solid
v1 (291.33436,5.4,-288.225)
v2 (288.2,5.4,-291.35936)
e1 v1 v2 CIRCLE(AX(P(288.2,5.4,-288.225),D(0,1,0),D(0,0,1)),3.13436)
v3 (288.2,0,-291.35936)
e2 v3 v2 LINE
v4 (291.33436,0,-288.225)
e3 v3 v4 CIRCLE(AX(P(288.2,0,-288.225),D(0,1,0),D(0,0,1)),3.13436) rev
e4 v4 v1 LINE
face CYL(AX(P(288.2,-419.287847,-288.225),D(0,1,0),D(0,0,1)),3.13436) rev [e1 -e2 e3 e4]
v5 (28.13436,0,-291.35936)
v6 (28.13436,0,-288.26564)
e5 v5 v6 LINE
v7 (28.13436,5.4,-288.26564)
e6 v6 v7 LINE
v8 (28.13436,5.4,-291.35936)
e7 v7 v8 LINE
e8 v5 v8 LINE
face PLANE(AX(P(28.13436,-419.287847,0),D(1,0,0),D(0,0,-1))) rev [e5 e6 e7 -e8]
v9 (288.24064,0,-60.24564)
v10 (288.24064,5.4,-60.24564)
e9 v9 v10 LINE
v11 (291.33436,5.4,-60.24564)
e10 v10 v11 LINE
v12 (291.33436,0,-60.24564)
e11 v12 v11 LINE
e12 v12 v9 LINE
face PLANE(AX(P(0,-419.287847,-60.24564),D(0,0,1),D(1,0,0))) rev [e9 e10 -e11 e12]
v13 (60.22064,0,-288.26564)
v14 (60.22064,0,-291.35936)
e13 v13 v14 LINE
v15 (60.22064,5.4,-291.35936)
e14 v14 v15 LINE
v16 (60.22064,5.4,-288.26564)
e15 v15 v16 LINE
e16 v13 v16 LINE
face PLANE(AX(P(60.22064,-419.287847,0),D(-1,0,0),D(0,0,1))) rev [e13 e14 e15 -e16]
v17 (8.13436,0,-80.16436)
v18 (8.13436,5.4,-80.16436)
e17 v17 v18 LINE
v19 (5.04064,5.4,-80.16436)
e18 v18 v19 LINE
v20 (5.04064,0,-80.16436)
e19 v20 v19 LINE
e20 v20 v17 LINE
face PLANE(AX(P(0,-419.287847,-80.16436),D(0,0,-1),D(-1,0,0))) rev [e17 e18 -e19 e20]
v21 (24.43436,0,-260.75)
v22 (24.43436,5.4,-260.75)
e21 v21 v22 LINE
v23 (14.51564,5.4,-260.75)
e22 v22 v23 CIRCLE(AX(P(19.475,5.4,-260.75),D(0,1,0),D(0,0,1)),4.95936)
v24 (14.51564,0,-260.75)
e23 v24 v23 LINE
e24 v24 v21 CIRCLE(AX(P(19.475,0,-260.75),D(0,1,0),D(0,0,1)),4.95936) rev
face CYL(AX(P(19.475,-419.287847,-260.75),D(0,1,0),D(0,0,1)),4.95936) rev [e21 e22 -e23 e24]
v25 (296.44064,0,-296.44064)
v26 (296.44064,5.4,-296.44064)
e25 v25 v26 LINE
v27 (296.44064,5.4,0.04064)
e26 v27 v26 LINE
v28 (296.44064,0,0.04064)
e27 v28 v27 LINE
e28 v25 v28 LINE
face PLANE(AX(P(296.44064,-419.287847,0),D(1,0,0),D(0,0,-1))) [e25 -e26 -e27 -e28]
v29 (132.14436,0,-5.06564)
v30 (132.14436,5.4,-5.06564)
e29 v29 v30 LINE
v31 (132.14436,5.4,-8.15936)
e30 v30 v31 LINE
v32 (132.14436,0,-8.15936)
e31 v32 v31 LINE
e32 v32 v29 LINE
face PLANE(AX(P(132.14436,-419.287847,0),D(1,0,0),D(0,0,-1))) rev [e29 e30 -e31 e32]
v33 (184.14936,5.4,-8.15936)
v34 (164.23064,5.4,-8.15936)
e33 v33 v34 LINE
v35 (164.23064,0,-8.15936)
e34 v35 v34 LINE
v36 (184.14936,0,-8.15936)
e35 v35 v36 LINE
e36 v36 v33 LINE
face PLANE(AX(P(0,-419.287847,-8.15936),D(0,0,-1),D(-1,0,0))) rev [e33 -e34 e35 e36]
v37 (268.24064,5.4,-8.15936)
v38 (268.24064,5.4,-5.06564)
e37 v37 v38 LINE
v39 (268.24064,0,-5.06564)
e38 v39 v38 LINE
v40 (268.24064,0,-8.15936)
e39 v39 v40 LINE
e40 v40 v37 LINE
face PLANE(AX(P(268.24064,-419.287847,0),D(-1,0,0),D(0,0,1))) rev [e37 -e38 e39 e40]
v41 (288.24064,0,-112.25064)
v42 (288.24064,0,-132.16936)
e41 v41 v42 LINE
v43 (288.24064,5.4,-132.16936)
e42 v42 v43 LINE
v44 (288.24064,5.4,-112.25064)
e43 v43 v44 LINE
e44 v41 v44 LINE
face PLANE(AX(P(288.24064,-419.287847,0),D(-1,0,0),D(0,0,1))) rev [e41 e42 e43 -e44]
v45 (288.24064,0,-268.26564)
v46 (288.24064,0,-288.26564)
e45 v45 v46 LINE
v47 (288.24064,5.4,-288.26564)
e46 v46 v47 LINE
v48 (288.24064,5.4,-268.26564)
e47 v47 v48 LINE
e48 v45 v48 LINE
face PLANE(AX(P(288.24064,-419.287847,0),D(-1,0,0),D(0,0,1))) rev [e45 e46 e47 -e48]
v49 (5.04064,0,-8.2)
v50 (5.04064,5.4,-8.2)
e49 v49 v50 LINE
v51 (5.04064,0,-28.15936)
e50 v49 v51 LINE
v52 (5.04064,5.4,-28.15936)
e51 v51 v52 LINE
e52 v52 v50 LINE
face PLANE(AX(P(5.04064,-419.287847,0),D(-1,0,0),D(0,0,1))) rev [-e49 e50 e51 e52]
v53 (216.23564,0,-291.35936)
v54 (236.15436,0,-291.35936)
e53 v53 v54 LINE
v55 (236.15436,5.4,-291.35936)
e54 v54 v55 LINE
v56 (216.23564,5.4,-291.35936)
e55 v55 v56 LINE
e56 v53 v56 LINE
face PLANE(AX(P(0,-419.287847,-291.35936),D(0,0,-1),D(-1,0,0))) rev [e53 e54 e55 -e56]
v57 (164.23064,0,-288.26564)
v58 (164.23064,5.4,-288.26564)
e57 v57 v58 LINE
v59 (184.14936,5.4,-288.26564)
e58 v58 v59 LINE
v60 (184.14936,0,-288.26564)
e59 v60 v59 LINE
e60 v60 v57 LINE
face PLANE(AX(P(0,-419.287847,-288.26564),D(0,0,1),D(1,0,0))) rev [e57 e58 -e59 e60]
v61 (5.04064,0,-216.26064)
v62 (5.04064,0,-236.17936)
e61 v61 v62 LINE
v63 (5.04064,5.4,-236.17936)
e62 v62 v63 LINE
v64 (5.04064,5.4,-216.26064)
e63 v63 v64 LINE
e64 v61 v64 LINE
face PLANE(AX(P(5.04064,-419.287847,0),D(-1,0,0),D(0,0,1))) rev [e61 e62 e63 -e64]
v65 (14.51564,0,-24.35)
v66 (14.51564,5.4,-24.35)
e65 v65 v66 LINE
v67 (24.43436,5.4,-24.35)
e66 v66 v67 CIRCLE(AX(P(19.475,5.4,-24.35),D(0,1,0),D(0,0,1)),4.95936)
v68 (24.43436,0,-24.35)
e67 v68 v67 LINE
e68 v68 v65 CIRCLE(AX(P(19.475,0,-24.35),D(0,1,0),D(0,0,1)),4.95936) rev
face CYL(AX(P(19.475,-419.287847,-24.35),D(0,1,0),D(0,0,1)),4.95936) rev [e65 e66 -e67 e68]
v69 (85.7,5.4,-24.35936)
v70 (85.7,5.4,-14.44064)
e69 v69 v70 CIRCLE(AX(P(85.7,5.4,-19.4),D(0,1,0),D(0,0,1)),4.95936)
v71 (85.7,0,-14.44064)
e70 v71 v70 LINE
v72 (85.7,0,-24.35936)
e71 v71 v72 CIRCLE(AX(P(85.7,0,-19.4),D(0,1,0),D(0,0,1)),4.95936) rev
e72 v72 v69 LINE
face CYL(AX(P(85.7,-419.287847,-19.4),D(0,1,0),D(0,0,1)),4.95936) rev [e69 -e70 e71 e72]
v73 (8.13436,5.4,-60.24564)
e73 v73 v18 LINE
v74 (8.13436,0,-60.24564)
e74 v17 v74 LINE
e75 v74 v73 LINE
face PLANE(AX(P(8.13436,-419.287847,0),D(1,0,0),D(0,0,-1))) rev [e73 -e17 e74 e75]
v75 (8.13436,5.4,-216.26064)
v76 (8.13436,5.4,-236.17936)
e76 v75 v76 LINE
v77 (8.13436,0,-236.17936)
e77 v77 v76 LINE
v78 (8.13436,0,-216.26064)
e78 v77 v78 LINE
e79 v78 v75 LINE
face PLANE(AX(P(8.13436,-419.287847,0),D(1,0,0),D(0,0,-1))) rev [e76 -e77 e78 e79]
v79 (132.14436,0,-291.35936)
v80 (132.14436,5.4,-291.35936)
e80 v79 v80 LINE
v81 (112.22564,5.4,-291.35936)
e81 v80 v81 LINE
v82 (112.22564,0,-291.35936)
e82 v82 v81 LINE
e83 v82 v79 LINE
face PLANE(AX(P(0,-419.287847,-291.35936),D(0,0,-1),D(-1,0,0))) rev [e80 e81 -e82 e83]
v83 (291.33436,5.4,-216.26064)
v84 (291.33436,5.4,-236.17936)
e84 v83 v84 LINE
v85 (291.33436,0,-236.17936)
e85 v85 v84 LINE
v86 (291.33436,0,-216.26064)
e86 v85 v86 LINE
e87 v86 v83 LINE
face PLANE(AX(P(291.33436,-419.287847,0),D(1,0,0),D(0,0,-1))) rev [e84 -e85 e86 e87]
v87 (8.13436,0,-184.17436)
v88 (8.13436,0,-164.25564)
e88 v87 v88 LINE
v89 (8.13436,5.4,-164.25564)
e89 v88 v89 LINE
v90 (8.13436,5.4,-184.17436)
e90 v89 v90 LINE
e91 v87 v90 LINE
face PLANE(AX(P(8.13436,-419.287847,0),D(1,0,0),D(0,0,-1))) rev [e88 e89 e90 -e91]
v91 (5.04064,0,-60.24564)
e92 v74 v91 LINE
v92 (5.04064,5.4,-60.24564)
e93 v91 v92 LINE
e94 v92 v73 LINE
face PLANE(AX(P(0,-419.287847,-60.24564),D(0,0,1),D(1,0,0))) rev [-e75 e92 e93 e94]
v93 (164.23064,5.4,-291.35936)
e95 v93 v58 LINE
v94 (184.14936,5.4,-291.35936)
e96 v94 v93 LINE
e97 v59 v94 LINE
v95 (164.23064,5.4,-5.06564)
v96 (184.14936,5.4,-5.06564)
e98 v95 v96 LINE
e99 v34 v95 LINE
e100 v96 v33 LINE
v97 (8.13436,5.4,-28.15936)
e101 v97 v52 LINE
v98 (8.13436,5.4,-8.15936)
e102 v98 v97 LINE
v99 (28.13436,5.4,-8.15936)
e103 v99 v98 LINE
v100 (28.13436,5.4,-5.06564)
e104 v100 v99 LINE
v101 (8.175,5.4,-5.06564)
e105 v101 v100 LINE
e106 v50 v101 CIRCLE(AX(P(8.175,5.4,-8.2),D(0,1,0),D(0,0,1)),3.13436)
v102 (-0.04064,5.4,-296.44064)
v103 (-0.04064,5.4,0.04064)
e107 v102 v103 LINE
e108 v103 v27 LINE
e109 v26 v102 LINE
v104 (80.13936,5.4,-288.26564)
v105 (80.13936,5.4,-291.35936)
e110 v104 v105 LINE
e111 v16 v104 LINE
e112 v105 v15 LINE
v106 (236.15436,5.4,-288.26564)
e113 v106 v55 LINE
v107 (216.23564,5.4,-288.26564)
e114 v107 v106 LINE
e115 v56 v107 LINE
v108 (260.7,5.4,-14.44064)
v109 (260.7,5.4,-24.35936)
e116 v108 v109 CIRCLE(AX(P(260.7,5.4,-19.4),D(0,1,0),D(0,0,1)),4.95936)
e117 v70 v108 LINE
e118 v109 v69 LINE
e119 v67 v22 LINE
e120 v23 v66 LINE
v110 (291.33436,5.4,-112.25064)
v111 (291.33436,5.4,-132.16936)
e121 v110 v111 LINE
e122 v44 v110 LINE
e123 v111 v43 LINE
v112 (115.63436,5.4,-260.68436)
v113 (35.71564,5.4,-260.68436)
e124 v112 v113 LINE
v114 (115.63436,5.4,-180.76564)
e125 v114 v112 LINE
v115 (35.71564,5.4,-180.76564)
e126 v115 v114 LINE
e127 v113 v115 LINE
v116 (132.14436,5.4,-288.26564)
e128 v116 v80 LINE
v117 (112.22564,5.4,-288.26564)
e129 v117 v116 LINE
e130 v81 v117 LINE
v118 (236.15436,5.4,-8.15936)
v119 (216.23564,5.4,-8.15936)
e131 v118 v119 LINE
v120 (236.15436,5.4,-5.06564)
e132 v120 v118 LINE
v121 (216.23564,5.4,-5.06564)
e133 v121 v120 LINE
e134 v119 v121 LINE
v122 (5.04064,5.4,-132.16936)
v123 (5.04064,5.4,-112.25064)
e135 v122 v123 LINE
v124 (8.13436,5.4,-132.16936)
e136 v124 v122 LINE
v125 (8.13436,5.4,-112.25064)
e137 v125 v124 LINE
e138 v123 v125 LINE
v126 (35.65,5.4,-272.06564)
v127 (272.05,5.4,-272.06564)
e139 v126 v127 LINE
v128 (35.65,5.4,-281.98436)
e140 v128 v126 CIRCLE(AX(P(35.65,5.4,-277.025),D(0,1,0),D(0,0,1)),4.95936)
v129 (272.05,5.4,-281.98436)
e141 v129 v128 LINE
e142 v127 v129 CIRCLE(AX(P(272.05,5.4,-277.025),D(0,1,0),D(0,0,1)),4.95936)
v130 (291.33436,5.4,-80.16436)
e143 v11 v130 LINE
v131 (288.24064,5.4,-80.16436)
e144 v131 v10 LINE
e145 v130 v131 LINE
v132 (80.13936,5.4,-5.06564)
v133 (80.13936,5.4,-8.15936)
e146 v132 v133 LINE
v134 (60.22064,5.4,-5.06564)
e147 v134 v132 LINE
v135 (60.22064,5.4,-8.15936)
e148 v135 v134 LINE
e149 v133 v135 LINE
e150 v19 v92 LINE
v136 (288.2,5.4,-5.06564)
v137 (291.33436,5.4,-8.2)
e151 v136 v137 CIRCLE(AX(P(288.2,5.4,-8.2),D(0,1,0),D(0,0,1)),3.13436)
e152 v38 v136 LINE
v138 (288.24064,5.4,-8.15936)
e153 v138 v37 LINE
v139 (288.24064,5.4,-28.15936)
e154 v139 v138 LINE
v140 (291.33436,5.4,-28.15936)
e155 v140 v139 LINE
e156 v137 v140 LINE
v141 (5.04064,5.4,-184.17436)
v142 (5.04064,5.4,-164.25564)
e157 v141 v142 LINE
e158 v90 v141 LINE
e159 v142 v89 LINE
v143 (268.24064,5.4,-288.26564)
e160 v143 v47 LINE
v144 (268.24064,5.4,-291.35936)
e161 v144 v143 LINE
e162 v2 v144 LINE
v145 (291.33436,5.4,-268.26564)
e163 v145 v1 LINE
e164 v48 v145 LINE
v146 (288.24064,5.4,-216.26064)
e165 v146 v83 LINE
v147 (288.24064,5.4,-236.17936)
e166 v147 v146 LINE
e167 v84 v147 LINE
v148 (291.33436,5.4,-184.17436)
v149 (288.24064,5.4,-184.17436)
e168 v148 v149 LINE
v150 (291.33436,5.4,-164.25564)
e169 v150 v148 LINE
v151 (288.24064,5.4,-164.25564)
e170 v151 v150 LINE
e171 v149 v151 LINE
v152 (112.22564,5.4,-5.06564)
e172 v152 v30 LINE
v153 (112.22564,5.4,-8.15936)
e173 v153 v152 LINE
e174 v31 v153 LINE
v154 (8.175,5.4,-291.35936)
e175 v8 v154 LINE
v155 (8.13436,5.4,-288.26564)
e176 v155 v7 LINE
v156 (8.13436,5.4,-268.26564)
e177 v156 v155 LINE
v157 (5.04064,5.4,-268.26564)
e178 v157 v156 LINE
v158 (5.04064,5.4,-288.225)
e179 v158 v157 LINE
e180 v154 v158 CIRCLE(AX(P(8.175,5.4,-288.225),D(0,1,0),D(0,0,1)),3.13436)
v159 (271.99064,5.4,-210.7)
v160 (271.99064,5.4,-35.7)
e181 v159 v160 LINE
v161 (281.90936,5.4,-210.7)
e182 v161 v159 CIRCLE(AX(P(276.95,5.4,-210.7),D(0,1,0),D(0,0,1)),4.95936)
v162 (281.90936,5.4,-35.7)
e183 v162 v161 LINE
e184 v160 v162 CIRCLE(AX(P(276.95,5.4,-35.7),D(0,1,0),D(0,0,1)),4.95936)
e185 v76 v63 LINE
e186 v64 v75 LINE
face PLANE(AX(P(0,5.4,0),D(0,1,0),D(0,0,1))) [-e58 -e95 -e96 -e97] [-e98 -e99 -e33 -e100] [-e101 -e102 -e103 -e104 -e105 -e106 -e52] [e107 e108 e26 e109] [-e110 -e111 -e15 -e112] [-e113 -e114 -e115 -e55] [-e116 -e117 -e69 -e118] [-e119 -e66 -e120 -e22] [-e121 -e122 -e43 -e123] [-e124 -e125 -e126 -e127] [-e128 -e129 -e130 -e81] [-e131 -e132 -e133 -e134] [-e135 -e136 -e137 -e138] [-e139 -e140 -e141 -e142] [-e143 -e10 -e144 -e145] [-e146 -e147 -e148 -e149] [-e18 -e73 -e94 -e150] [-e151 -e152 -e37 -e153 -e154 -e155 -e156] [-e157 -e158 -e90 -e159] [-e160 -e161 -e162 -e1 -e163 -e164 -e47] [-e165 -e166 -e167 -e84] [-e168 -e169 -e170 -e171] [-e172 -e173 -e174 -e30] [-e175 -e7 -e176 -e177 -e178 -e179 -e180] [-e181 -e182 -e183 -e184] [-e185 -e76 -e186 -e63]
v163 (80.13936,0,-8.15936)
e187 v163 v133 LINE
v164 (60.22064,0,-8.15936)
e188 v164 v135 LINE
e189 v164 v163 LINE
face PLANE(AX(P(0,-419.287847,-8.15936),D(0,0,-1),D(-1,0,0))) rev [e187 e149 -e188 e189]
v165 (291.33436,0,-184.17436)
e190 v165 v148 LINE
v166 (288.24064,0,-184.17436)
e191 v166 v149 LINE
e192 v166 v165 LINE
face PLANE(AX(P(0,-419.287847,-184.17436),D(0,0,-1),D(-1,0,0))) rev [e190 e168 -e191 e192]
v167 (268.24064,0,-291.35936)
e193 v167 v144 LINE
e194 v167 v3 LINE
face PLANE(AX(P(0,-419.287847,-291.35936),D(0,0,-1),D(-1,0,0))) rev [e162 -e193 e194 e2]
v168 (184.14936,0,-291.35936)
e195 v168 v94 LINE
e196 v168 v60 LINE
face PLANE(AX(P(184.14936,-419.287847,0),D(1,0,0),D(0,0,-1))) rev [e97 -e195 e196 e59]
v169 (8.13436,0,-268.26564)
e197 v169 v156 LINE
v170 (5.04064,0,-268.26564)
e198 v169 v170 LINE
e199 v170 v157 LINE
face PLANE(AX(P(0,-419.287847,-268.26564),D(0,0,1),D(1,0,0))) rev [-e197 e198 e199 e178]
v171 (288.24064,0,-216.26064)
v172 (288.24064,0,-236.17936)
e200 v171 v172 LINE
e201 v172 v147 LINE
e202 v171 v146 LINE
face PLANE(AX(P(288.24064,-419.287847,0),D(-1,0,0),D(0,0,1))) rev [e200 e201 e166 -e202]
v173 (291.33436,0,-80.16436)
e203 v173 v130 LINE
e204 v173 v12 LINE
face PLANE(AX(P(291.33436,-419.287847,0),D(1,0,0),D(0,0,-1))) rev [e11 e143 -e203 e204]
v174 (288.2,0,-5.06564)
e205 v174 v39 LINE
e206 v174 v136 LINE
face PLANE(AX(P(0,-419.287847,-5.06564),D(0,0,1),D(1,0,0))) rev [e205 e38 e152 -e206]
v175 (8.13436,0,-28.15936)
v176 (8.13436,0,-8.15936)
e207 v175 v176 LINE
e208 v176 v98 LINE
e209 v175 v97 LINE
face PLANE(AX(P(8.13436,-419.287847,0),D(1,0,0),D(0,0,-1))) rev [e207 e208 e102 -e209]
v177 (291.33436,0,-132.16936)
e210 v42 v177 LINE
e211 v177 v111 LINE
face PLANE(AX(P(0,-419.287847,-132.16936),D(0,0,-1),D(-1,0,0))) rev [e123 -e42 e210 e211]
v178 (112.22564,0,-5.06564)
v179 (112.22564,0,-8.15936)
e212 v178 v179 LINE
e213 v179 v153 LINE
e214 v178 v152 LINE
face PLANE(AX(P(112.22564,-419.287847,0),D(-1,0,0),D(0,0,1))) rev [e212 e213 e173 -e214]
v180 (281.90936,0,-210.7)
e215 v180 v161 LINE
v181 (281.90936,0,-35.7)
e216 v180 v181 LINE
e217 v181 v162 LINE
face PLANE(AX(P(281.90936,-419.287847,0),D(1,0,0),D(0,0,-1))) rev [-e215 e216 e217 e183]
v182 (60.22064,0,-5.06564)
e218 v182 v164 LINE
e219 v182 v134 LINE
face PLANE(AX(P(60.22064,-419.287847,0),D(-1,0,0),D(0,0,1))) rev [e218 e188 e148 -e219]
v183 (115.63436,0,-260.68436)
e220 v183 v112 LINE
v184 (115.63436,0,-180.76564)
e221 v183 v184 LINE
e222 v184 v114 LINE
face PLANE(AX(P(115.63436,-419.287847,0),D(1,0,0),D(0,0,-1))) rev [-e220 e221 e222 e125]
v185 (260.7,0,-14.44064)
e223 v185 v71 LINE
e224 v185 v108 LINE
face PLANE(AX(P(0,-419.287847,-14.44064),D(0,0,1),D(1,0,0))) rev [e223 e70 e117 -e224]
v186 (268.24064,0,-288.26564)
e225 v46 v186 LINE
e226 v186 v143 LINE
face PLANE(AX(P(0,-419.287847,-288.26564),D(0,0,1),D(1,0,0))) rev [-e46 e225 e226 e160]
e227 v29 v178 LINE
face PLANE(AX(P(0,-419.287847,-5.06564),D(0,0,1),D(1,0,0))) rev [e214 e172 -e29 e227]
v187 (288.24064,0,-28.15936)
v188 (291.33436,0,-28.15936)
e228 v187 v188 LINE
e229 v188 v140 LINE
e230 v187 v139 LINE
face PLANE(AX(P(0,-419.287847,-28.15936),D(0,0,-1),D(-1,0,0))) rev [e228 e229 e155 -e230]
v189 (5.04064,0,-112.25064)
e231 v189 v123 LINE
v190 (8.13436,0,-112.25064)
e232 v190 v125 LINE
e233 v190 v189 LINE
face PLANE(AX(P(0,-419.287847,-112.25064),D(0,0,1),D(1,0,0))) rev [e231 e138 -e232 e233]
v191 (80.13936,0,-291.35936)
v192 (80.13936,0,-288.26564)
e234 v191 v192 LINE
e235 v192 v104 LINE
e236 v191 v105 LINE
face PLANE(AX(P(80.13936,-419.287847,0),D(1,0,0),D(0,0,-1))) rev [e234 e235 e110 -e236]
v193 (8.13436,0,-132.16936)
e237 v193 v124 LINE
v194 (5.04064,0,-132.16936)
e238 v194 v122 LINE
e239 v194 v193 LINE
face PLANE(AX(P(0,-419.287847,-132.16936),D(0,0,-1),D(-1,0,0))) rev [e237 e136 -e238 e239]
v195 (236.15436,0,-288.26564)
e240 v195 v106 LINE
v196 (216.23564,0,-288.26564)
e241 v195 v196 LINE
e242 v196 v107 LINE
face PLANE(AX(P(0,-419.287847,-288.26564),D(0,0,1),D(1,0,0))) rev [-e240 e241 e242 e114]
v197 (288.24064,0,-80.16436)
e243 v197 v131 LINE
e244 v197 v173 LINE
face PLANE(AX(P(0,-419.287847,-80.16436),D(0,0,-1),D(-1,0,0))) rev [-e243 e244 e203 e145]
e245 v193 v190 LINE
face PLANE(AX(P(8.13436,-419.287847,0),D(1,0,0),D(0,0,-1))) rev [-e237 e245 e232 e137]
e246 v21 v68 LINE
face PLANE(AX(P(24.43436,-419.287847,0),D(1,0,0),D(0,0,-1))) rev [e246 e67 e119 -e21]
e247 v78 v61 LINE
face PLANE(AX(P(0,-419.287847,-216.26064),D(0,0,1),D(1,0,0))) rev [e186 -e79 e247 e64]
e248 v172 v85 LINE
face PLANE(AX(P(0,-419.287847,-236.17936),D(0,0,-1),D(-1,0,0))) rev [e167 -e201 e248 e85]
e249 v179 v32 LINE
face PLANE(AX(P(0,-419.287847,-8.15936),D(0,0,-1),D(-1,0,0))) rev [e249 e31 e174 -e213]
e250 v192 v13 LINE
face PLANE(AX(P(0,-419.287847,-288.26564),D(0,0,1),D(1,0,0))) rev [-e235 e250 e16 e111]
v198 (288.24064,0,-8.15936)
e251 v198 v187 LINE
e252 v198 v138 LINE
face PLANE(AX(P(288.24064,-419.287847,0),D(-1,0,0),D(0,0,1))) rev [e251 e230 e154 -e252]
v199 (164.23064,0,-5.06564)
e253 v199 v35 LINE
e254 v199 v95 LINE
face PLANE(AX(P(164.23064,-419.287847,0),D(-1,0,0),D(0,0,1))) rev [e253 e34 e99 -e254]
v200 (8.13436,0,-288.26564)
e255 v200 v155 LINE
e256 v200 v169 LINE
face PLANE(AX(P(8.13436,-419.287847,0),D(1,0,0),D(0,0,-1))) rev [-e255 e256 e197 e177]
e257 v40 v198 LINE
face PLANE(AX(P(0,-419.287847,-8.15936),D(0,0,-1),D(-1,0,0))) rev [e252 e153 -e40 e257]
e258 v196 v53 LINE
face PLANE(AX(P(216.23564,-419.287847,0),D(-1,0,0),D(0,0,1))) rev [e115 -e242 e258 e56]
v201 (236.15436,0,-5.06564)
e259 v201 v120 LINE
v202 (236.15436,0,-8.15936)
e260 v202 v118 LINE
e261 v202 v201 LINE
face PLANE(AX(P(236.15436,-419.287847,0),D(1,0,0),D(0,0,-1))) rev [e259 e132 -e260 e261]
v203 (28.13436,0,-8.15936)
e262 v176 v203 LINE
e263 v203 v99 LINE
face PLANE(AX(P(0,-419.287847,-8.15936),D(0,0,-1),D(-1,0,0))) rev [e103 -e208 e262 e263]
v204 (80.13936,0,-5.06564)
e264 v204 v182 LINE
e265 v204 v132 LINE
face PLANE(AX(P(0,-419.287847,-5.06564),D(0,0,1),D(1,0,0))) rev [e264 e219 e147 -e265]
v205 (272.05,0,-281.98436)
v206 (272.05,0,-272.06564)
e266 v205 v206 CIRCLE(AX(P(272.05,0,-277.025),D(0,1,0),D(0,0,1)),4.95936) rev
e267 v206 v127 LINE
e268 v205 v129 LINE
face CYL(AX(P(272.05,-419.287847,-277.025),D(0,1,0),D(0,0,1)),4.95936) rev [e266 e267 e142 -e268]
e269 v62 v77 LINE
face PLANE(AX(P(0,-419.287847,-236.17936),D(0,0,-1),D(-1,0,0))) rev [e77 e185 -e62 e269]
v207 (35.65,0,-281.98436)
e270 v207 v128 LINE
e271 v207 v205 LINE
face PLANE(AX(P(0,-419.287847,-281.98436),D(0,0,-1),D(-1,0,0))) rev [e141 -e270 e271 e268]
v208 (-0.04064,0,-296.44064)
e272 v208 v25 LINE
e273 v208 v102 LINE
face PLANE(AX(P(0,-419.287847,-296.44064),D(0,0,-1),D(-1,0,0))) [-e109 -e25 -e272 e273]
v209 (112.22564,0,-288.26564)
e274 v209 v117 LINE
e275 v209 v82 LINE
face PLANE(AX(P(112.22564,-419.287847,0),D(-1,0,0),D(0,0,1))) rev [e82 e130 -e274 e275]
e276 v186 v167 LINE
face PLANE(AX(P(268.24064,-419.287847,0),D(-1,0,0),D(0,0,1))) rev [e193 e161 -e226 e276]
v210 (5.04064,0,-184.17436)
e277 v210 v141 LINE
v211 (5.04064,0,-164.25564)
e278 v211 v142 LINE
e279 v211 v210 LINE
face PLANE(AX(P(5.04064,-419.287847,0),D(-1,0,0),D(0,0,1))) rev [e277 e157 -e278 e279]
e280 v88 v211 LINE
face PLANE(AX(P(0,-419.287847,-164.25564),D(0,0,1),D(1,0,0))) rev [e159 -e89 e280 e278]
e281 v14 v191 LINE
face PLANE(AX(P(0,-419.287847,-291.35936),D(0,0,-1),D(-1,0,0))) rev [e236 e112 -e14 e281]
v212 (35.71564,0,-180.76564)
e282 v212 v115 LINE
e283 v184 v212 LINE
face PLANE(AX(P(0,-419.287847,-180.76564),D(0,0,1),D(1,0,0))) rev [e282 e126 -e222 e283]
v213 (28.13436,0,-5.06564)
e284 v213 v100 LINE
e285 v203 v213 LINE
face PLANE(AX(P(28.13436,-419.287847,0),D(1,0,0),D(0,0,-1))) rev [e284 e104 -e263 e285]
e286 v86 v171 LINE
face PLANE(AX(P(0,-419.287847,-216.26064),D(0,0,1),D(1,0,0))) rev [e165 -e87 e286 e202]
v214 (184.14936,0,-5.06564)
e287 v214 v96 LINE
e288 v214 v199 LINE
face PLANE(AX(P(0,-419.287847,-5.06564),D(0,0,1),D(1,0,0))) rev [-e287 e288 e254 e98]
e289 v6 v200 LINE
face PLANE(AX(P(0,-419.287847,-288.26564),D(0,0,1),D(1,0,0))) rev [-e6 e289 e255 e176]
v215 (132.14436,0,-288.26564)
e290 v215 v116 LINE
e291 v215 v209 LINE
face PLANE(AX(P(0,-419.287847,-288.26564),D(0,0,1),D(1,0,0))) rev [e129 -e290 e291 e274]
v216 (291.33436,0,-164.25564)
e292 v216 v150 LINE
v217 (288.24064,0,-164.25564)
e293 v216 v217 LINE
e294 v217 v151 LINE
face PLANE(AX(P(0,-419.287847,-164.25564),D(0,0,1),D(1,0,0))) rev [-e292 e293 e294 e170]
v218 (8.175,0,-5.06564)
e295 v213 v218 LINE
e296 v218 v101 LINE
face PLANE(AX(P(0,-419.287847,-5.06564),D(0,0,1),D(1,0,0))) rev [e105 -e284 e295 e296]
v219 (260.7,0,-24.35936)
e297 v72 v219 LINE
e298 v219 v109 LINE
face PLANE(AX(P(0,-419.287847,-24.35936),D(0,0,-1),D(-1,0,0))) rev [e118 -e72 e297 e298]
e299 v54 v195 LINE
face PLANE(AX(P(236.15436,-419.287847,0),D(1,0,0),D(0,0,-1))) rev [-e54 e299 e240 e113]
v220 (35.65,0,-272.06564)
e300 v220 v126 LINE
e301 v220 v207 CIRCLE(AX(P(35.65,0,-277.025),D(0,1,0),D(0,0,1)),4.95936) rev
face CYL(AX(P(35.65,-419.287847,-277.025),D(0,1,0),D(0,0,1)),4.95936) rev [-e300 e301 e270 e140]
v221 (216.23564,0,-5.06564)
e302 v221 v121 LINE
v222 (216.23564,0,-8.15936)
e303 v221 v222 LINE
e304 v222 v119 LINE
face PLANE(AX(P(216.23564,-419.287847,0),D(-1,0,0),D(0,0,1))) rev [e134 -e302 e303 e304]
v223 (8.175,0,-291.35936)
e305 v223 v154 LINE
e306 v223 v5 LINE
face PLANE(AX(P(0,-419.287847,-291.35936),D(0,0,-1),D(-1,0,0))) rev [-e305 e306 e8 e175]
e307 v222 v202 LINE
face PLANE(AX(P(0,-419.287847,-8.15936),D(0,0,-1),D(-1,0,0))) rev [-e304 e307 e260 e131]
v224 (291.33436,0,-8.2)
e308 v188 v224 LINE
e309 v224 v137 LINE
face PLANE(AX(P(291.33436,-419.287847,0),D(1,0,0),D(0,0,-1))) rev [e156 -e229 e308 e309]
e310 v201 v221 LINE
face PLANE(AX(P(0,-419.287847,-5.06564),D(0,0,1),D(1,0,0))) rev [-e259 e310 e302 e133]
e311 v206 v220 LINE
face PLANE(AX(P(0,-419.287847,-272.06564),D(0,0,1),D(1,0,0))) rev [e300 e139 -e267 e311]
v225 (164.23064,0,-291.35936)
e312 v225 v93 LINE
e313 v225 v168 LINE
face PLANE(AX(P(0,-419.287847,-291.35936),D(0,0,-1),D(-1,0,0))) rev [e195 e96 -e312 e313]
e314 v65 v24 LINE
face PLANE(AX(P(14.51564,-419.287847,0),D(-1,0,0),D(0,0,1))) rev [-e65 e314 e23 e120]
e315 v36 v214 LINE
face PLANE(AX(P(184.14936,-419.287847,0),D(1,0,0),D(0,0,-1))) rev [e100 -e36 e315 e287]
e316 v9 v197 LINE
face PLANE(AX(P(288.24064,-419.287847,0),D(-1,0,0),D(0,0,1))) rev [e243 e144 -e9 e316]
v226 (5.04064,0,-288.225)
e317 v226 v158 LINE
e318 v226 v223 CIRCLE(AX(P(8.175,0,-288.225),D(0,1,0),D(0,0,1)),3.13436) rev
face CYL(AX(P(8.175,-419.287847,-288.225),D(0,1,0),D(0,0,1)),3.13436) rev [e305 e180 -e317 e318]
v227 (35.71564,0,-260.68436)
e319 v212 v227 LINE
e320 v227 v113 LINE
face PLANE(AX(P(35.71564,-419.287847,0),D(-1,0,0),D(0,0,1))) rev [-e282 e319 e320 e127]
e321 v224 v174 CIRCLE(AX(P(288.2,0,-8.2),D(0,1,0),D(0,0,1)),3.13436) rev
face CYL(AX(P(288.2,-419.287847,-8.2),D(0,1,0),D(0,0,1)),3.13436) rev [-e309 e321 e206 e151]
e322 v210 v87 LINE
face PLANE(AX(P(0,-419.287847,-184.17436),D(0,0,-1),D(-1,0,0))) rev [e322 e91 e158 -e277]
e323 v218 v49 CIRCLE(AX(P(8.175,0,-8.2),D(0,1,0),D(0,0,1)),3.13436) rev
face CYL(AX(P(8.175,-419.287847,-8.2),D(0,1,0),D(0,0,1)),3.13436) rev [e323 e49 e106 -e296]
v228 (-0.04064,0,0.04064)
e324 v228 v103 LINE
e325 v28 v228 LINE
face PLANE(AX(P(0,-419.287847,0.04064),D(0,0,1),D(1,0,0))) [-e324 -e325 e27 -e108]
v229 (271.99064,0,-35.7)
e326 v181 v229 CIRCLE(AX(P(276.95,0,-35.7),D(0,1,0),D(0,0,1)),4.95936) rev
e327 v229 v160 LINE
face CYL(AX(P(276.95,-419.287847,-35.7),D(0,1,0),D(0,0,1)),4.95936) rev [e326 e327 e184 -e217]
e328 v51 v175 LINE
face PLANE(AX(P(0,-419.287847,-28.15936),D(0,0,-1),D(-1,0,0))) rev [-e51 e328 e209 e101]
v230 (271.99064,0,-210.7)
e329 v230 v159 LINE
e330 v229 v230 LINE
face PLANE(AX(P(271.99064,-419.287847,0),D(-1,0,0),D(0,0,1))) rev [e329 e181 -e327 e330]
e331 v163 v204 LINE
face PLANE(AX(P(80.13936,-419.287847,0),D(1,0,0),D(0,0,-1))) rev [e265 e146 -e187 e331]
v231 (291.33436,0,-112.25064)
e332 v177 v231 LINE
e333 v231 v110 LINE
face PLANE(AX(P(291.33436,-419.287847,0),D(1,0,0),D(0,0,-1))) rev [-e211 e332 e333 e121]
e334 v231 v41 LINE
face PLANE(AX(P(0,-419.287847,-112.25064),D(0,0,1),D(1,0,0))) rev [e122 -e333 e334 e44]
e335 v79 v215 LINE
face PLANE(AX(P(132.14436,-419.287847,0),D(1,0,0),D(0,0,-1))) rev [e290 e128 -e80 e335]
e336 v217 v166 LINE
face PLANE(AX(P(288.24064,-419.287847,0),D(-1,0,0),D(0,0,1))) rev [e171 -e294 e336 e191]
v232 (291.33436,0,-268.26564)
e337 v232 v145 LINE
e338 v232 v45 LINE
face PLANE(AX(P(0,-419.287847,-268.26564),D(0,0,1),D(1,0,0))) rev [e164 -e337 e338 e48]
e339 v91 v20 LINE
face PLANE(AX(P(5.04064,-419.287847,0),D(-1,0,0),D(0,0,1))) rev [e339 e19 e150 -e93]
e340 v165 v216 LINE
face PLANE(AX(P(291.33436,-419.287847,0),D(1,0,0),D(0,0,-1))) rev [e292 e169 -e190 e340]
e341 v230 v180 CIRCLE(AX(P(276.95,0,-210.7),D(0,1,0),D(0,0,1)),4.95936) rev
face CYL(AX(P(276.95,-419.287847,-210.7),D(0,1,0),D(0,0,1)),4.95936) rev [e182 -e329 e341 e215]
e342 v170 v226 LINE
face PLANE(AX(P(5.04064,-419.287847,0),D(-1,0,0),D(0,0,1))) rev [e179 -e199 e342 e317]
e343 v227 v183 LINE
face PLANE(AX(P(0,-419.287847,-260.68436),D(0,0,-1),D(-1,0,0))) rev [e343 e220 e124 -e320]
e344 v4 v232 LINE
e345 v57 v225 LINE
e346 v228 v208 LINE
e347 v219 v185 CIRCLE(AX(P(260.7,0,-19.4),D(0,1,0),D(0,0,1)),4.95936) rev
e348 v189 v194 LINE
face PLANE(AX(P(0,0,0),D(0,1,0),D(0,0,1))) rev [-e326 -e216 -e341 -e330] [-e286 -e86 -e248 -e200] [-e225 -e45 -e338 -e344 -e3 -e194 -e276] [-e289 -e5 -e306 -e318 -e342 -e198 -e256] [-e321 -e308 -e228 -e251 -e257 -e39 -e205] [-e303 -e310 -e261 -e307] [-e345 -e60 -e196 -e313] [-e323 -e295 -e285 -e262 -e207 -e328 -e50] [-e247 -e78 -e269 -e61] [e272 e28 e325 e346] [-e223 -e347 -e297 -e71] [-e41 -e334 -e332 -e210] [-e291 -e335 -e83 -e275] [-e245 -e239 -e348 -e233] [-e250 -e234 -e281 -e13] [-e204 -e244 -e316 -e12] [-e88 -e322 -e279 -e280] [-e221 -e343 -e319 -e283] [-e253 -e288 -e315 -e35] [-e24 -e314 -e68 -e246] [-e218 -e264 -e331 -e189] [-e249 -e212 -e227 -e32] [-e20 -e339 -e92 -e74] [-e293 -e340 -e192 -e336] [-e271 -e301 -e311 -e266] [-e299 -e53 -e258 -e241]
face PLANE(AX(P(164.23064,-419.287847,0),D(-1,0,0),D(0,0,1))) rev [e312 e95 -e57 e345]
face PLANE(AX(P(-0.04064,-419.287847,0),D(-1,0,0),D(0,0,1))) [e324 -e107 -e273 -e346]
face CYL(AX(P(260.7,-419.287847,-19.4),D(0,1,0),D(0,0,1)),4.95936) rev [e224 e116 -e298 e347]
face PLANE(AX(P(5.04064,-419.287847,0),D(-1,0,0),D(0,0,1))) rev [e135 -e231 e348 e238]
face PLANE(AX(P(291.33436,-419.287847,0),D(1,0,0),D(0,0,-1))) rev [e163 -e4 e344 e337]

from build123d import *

# Parameters (mm, degrees)
BOSS_EXTRUDE1_OUTLINE_W   = 296.4
BOSS_EXTRUDE1_OUTLINE_H   = 296.4
BOSS_EXTRUDE1_OUTLINE_W_2 = 20
BOSS_EXTRUDE1_OUTLINE_H_2 = 3.175
BOSS_EXTRUDE1_OUTLINE_W_3 = 3.175
BOSS_EXTRUDE1_OUTLINE_H_3 = 20
BOSS_EXTRUDE1_DEPTH       = 5.4
SKETCH3_W                 = 10
SKETCH3_H                 = 236.4
SKETCH3_W_2               = 236.4
SKETCH3_H_2               = 10
SKETCH3_W_3               = 80
SKETCH3_H_3               = 80
SKETCH3_H_4               = 175
SKETCH3_W_4               = 175
CUT_EXTRUDE5_DEPTH        = 10
SKETCH5_W                 = 296.48128
SKETCH5_H                 = 296.48128
SKETCH5_W_2               = 79.91872
SKETCH5_H_2               = 79.91872
SKETCH5_W_3               = 19.91872
SKETCH5_H_3               = 3.09372
SKETCH5_W_4               = 3.09372
SKETCH5_H_4               = 19.91872
BOSS_EXTRUDE2_DEPTH       = 5.4


# Read off the part's stored shape, not the designer's step: Boss-Extrude1
with BuildPart() as part:
    # Boss-Extrude1 outline → Boss-Extrude1 (new body)
    with BuildSketch(Plane(origin=(0, 0, 0), x_dir=(1, 0, 0), z_dir=(0, 1, 0))):
        with Locations((148.2, 148.2)):
            Rectangle(BOSS_EXTRUDE1_OUTLINE_W, BOSS_EXTRUDE1_OUTLINE_H)
        with BuildLine():
            Line((28.175, 5.025), (8.175, 5.025))
            ThreePointArc((8.175, 5.025), (5.92993597, 5.95493597), (5, 8.2))
            Line((5, 8.2), (5, 28.2))
            Line((5, 28.2), (8.175, 28.2))
            Line((8.175, 28.2), (8.175, 8.2))
            Line((8.175, 8.2), (28.175, 8.2))
            Line((28.175, 8.2), (28.175, 5.025))
        make_face(mode=Mode.SUBTRACT)
        with Locations((70.18, 6.6125)):
            Rectangle(BOSS_EXTRUDE1_OUTLINE_W_2, BOSS_EXTRUDE1_OUTLINE_H_2, mode=Mode.SUBTRACT)
        with Locations((6.5875, 70.205)):
            Rectangle(BOSS_EXTRUDE1_OUTLINE_W_3, BOSS_EXTRUDE1_OUTLINE_H_3, mode=Mode.SUBTRACT)
        with Locations((122.185, 6.6125)):
            Rectangle(BOSS_EXTRUDE1_OUTLINE_W_2, BOSS_EXTRUDE1_OUTLINE_H_2, mode=Mode.SUBTRACT)
        with Locations((6.5875, 122.21)):
            Rectangle(BOSS_EXTRUDE1_OUTLINE_W_3, BOSS_EXTRUDE1_OUTLINE_H_3, mode=Mode.SUBTRACT)
        with Locations((174.19, 6.6125)):
            Rectangle(BOSS_EXTRUDE1_OUTLINE_W_2, BOSS_EXTRUDE1_OUTLINE_H_2, mode=Mode.SUBTRACT)
        with Locations((226.195, 6.6125)):
            Rectangle(BOSS_EXTRUDE1_OUTLINE_W_2, BOSS_EXTRUDE1_OUTLINE_H_2, mode=Mode.SUBTRACT)
        with BuildLine():
            Line((291.375, 28.2), (291.375, 8.2))
            ThreePointArc((291.375, 8.2), (290.44506403, 5.95493597), (288.2, 5.025))
            Line((288.2, 5.025), (268.2, 5.025))
            Line((268.2, 5.025), (268.2, 8.2))
            Line((268.2, 8.2), (288.2, 8.2))
            Line((288.2, 8.2), (288.2, 28.2))
            Line((288.2, 28.2), (291.375, 28.2))
        make_face(mode=Mode.SUBTRACT)
        with Locations((289.7875, 70.205)):
            Rectangle(BOSS_EXTRUDE1_OUTLINE_W_3, BOSS_EXTRUDE1_OUTLINE_H_3, mode=Mode.SUBTRACT)
        with Locations((289.7875, 122.21)):
            Rectangle(BOSS_EXTRUDE1_OUTLINE_W_3, BOSS_EXTRUDE1_OUTLINE_H_3, mode=Mode.SUBTRACT)
        with Locations((6.5875, 174.215)):
            Rectangle(BOSS_EXTRUDE1_OUTLINE_W_3, BOSS_EXTRUDE1_OUTLINE_H_3, mode=Mode.SUBTRACT)
        with Locations((6.5875, 226.22)):
            Rectangle(BOSS_EXTRUDE1_OUTLINE_W_3, BOSS_EXTRUDE1_OUTLINE_H_3, mode=Mode.SUBTRACT)
        with BuildLine():
            Line((5, 268.225), (5, 288.225))
            ThreePointArc((5, 288.225), (5.92993597, 290.47006403), (8.175, 291.4))
            Line((8.175, 291.4), (28.175, 291.4))
            Line((28.175, 291.4), (28.175, 288.225))
            Line((28.175, 288.225), (8.175, 288.225))
            Line((8.175, 288.225), (8.175, 268.225))
            Line((8.175, 268.225), (5, 268.225))
        make_face(mode=Mode.SUBTRACT)
        with Locations((70.18, 289.8125)):
            Rectangle(BOSS_EXTRUDE1_OUTLINE_W_2, BOSS_EXTRUDE1_OUTLINE_H_2, mode=Mode.SUBTRACT)
        with Locations((122.185, 289.8125)):
            Rectangle(BOSS_EXTRUDE1_OUTLINE_W_2, BOSS_EXTRUDE1_OUTLINE_H_2, mode=Mode.SUBTRACT)
        with Locations((289.7875, 174.215)):
            Rectangle(BOSS_EXTRUDE1_OUTLINE_W_3, BOSS_EXTRUDE1_OUTLINE_H_3, mode=Mode.SUBTRACT)
        with Locations((174.19, 289.8125)):
            Rectangle(BOSS_EXTRUDE1_OUTLINE_W_2, BOSS_EXTRUDE1_OUTLINE_H_2, mode=Mode.SUBTRACT)
        with Locations((289.7875, 226.22)):
            Rectangle(BOSS_EXTRUDE1_OUTLINE_W_3, BOSS_EXTRUDE1_OUTLINE_H_3, mode=Mode.SUBTRACT)
        with Locations((226.195, 289.8125)):
            Rectangle(BOSS_EXTRUDE1_OUTLINE_W_2, BOSS_EXTRUDE1_OUTLINE_H_2, mode=Mode.SUBTRACT)
        with BuildLine():
            Line((268.2, 291.4), (288.2, 291.4))
            ThreePointArc((288.2, 291.4), (290.44506403, 290.47006403), (291.375, 288.225))
            Line((291.375, 288.225), (291.375, 268.225))
            Line((291.375, 268.225), (288.2, 268.225))
            Line((288.2, 268.225), (288.2, 288.225))
            Line((288.2, 288.225), (268.2, 288.225))
            Line((268.2, 288.225), (268.2, 291.4))
        make_face(mode=Mode.SUBTRACT)
    extrude(amount=BOSS_EXTRUDE1_DEPTH)

    # Sketch3 → Cut-Extrude5 (cut)
    with BuildSketch(Plane(origin=(0, 5.4, 0), x_dir=(1, 0, 0), z_dir=(0, 1, 0))):
        with BuildLine():
            ThreePointArc((24.475, 24.35), (19.475, 19.35), (14.475, 24.35))
            Line((14.475, 24.35), (24.475, 24.35))
        make_face()
        with Locations((19.475, 142.55)):
            Rectangle(SKETCH3_W, SKETCH3_H)
        with BuildLine():
            Line((24.475, 260.75), (14.475, 260.75))
            ThreePointArc((14.475, 260.75), (19.475, 265.75), (24.475, 260.75))
        make_face()
        with BuildLine():
            Line((35.65, 282.025), (35.65, 272.025))
            ThreePointArc((35.65, 272.025), (30.65, 277.025), (35.65, 282.025))
        make_face()
        with Locations((153.85, 277.025)):
            Rectangle(SKETCH3_W_2, SKETCH3_H_2)
        with BuildLine():
            ThreePointArc((272.05, 282.025), (277.05, 277.025), (272.05, 272.025))
            Line((272.05, 272.025), (272.05, 282.025))
        make_face()
        with Locations((75.675, 220.725)):
            Rectangle(SKETCH3_W_3, SKETCH3_H_3)
        with Locations((276.95, 123.2)):
            Rectangle(SKETCH3_W, SKETCH3_H_4)
        with BuildLine():
            Line((281.95, 210.7), (271.95, 210.7))
            ThreePointArc((271.95, 210.7), (276.95, 215.7), (281.95, 210.7))
        make_face()
        with BuildLine():
            ThreePointArc((281.95, 35.7), (276.95, 30.7), (271.95, 35.7))
            Line((271.95, 35.7), (281.95, 35.7))
        make_face()
        with BuildLine():
            ThreePointArc((260.7, 24.4), (265.7, 19.4), (260.7, 14.4))
            Line((260.7, 14.4), (260.7, 24.4))
        make_face()
        with Locations((173.2, 19.4)):
            Rectangle(SKETCH3_W_4, SKETCH3_H_2)
        with BuildLine():
            Line((85.7, 14.4), (85.7, 24.4))
            ThreePointArc((85.7, 24.4), (80.7, 19.4), (85.7, 14.4))
        make_face()
    extrude(amount=-CUT_EXTRUDE5_DEPTH, mode=Mode.SUBTRACT)

    # Sketch5 → Boss-Extrude2 (add)
    with BuildSketch(Plane(origin=(0, 5.4, 0), x_dir=(1, 0, 0), z_dir=(0, 1, 0))):
        with Locations((148.2, 148.2)):
            Rectangle(SKETCH5_W, SKETCH5_H)
        with BuildLine():
            Line((24.43436, 24.35), (24.43436, 260.75))
            ThreePointArc((24.43436, 260.75), (19.475, 265.70936), (14.51564, 260.75))
            Line((14.51564, 260.75), (14.51564, 24.35))
            ThreePointArc((14.51564, 24.35), (19.475, 19.39064), (24.43436, 24.35))
        make_face(mode=Mode.SUBTRACT)
        with Locations((75.675, 220.725)):
            Rectangle(SKETCH5_W_2, SKETCH5_H_2, mode=Mode.SUBTRACT)
        with BuildLine():
            Line((291.33436, 268.26564), (291.33436, 288.225))
            ThreePointArc((291.33436, 288.225), (290.416327211, 290.441327211), (288.2, 291.35936))
            Line((288.2, 291.35936), (268.24064, 291.35936))
            Line((268.24064, 291.35936), (268.24064, 288.26564))
            Line((268.24064, 288.26564), (288.24064, 288.26564))
            Line((288.24064, 288.26564), (288.24064, 268.26564))
            Line((288.24064, 268.26564), (291.33436, 268.26564))
        make_face(mode=Mode.SUBTRACT)
        with BuildLine():
            Line((268.24064, 5.06564), (288.2, 5.06564))
            ThreePointArc((288.2, 5.06564), (290.416327211, 5.983672789), (291.33436, 8.2))
            Line((291.33436, 8.2), (291.33436, 28.15936))
            Line((291.33436, 28.15936), (288.24064, 28.15936))
            Line((288.24064, 28.15936), (288.24064, 8.15936))
            Line((288.24064, 8.15936), (268.24064, 8.15936))
            Line((268.24064, 8.15936), (268.24064, 5.06564))
        make_face(mode=Mode.SUBTRACT)
        with BuildLine():
            Line((5.04064, 28.15936), (5.04064, 8.2))
            ThreePointArc((5.04064, 8.2), (5.958672789, 5.983672789), (8.175, 5.06564))
            Line((8.175, 5.06564), (28.13436, 5.06564))
            Line((28.13436, 5.06564), (28.13436, 8.15936))
            Line((28.13436, 8.15936), (8.13436, 8.15936))
            Line((8.13436, 8.15936), (8.13436, 28.15936))
            Line((8.13436, 28.15936), (5.04064, 28.15936))
        make_face(mode=Mode.SUBTRACT)
        with Locations((70.18, 289.8125)):
            Rectangle(SKETCH5_W_3, SKETCH5_H_3, mode=Mode.SUBTRACT)
        with Locations((122.185, 289.8125)):
            Rectangle(SKETCH5_W_3, SKETCH5_H_3, mode=Mode.SUBTRACT)
        with Locations((174.19, 289.8125)):
            Rectangle(SKETCH5_W_3, SKETCH5_H_3, mode=Mode.SUBTRACT)
        with Locations((226.195, 289.8125)):
            Rectangle(SKETCH5_W_3, SKETCH5_H_3, mode=Mode.SUBTRACT)
        with Locations((289.7875, 226.22)):
            Rectangle(SKETCH5_W_4, SKETCH5_H_4, mode=Mode.SUBTRACT)
        with Locations((289.7875, 174.215)):
            Rectangle(SKETCH5_W_4, SKETCH5_H_4, mode=Mode.SUBTRACT)
        with Locations((289.7875, 122.21)):
            Rectangle(SKETCH5_W_4, SKETCH5_H_4, mode=Mode.SUBTRACT)
        with Locations((289.7875, 70.205)):
            Rectangle(SKETCH5_W_4, SKETCH5_H_4, mode=Mode.SUBTRACT)
        with Locations((6.5875, 226.22)):
            Rectangle(SKETCH5_W_4, SKETCH5_H_4, mode=Mode.SUBTRACT)
        with Locations((6.5875, 174.215)):
            Rectangle(SKETCH5_W_4, SKETCH5_H_4, mode=Mode.SUBTRACT)
        with Locations((6.5875, 122.21)):
            Rectangle(SKETCH5_W_4, SKETCH5_H_4, mode=Mode.SUBTRACT)
        with Locations((6.5875, 70.205)):
            Rectangle(SKETCH5_W_4, SKETCH5_H_4, mode=Mode.SUBTRACT)
        with Locations((70.18, 6.6125)):
            Rectangle(SKETCH5_W_3, SKETCH5_H_3, mode=Mode.SUBTRACT)
        with Locations((122.185, 6.6125)):
            Rectangle(SKETCH5_W_3, SKETCH5_H_3, mode=Mode.SUBTRACT)
        with Locations((174.19, 6.6125)):
            Rectangle(SKETCH5_W_3, SKETCH5_H_3, mode=Mode.SUBTRACT)
        with Locations((226.195, 6.6125)):
            Rectangle(SKETCH5_W_3, SKETCH5_H_3, mode=Mode.SUBTRACT)
        with BuildLine():
            Line((271.99064, 210.7), (271.99064, 35.7))
            ThreePointArc((271.99064, 35.7), (276.95, 30.74064), (281.90936, 35.7))
            Line((281.90936, 35.7), (281.90936, 210.7))
            ThreePointArc((281.90936, 210.7), (276.95, 215.65936), (271.99064, 210.7))
        make_face(mode=Mode.SUBTRACT)
        with BuildLine():
            Line((5.04064, 288.225), (5.04064, 268.26564))
            Line((5.04064, 268.26564), (8.13436, 268.26564))
            Line((8.13436, 268.26564), (8.13436, 288.26564))
            Line((8.13436, 288.26564), (28.13436, 288.26564))
            Line((28.13436, 288.26564), (28.13436, 291.35936))
            Line((28.13436, 291.35936), (8.175, 291.35936))
            ThreePointArc((8.175, 291.35936), (5.958672789, 290.441327211), (5.04064, 288.225))
        make_face(mode=Mode.SUBTRACT)
        with BuildLine():
            Line((260.7, 24.35936), (85.7, 24.35936))
            ThreePointArc((85.7, 24.35936), (80.74064, 19.4), (85.7, 14.44064))
            Line((85.7, 14.44064), (260.7, 14.44064))
            ThreePointArc((260.7, 14.44064), (265.65936, 19.4), (260.7, 24.35936))
        make_face(mode=Mode.SUBTRACT)
        with BuildLine():
            Line((272.05, 281.98436), (35.65, 281.98436))
            ThreePointArc((35.65, 281.98436), (30.69064, 277.025), (35.65, 272.06564))
            Line((35.65, 272.06564), (272.05, 272.06564))
            ThreePointArc((272.05, 272.06564), (277.00936, 277.025), (272.05, 281.98436))
        make_face(mode=Mode.SUBTRACT)
    extrude(amount=-BOSS_EXTRUDE2_DEPTH)


solid = part.part
